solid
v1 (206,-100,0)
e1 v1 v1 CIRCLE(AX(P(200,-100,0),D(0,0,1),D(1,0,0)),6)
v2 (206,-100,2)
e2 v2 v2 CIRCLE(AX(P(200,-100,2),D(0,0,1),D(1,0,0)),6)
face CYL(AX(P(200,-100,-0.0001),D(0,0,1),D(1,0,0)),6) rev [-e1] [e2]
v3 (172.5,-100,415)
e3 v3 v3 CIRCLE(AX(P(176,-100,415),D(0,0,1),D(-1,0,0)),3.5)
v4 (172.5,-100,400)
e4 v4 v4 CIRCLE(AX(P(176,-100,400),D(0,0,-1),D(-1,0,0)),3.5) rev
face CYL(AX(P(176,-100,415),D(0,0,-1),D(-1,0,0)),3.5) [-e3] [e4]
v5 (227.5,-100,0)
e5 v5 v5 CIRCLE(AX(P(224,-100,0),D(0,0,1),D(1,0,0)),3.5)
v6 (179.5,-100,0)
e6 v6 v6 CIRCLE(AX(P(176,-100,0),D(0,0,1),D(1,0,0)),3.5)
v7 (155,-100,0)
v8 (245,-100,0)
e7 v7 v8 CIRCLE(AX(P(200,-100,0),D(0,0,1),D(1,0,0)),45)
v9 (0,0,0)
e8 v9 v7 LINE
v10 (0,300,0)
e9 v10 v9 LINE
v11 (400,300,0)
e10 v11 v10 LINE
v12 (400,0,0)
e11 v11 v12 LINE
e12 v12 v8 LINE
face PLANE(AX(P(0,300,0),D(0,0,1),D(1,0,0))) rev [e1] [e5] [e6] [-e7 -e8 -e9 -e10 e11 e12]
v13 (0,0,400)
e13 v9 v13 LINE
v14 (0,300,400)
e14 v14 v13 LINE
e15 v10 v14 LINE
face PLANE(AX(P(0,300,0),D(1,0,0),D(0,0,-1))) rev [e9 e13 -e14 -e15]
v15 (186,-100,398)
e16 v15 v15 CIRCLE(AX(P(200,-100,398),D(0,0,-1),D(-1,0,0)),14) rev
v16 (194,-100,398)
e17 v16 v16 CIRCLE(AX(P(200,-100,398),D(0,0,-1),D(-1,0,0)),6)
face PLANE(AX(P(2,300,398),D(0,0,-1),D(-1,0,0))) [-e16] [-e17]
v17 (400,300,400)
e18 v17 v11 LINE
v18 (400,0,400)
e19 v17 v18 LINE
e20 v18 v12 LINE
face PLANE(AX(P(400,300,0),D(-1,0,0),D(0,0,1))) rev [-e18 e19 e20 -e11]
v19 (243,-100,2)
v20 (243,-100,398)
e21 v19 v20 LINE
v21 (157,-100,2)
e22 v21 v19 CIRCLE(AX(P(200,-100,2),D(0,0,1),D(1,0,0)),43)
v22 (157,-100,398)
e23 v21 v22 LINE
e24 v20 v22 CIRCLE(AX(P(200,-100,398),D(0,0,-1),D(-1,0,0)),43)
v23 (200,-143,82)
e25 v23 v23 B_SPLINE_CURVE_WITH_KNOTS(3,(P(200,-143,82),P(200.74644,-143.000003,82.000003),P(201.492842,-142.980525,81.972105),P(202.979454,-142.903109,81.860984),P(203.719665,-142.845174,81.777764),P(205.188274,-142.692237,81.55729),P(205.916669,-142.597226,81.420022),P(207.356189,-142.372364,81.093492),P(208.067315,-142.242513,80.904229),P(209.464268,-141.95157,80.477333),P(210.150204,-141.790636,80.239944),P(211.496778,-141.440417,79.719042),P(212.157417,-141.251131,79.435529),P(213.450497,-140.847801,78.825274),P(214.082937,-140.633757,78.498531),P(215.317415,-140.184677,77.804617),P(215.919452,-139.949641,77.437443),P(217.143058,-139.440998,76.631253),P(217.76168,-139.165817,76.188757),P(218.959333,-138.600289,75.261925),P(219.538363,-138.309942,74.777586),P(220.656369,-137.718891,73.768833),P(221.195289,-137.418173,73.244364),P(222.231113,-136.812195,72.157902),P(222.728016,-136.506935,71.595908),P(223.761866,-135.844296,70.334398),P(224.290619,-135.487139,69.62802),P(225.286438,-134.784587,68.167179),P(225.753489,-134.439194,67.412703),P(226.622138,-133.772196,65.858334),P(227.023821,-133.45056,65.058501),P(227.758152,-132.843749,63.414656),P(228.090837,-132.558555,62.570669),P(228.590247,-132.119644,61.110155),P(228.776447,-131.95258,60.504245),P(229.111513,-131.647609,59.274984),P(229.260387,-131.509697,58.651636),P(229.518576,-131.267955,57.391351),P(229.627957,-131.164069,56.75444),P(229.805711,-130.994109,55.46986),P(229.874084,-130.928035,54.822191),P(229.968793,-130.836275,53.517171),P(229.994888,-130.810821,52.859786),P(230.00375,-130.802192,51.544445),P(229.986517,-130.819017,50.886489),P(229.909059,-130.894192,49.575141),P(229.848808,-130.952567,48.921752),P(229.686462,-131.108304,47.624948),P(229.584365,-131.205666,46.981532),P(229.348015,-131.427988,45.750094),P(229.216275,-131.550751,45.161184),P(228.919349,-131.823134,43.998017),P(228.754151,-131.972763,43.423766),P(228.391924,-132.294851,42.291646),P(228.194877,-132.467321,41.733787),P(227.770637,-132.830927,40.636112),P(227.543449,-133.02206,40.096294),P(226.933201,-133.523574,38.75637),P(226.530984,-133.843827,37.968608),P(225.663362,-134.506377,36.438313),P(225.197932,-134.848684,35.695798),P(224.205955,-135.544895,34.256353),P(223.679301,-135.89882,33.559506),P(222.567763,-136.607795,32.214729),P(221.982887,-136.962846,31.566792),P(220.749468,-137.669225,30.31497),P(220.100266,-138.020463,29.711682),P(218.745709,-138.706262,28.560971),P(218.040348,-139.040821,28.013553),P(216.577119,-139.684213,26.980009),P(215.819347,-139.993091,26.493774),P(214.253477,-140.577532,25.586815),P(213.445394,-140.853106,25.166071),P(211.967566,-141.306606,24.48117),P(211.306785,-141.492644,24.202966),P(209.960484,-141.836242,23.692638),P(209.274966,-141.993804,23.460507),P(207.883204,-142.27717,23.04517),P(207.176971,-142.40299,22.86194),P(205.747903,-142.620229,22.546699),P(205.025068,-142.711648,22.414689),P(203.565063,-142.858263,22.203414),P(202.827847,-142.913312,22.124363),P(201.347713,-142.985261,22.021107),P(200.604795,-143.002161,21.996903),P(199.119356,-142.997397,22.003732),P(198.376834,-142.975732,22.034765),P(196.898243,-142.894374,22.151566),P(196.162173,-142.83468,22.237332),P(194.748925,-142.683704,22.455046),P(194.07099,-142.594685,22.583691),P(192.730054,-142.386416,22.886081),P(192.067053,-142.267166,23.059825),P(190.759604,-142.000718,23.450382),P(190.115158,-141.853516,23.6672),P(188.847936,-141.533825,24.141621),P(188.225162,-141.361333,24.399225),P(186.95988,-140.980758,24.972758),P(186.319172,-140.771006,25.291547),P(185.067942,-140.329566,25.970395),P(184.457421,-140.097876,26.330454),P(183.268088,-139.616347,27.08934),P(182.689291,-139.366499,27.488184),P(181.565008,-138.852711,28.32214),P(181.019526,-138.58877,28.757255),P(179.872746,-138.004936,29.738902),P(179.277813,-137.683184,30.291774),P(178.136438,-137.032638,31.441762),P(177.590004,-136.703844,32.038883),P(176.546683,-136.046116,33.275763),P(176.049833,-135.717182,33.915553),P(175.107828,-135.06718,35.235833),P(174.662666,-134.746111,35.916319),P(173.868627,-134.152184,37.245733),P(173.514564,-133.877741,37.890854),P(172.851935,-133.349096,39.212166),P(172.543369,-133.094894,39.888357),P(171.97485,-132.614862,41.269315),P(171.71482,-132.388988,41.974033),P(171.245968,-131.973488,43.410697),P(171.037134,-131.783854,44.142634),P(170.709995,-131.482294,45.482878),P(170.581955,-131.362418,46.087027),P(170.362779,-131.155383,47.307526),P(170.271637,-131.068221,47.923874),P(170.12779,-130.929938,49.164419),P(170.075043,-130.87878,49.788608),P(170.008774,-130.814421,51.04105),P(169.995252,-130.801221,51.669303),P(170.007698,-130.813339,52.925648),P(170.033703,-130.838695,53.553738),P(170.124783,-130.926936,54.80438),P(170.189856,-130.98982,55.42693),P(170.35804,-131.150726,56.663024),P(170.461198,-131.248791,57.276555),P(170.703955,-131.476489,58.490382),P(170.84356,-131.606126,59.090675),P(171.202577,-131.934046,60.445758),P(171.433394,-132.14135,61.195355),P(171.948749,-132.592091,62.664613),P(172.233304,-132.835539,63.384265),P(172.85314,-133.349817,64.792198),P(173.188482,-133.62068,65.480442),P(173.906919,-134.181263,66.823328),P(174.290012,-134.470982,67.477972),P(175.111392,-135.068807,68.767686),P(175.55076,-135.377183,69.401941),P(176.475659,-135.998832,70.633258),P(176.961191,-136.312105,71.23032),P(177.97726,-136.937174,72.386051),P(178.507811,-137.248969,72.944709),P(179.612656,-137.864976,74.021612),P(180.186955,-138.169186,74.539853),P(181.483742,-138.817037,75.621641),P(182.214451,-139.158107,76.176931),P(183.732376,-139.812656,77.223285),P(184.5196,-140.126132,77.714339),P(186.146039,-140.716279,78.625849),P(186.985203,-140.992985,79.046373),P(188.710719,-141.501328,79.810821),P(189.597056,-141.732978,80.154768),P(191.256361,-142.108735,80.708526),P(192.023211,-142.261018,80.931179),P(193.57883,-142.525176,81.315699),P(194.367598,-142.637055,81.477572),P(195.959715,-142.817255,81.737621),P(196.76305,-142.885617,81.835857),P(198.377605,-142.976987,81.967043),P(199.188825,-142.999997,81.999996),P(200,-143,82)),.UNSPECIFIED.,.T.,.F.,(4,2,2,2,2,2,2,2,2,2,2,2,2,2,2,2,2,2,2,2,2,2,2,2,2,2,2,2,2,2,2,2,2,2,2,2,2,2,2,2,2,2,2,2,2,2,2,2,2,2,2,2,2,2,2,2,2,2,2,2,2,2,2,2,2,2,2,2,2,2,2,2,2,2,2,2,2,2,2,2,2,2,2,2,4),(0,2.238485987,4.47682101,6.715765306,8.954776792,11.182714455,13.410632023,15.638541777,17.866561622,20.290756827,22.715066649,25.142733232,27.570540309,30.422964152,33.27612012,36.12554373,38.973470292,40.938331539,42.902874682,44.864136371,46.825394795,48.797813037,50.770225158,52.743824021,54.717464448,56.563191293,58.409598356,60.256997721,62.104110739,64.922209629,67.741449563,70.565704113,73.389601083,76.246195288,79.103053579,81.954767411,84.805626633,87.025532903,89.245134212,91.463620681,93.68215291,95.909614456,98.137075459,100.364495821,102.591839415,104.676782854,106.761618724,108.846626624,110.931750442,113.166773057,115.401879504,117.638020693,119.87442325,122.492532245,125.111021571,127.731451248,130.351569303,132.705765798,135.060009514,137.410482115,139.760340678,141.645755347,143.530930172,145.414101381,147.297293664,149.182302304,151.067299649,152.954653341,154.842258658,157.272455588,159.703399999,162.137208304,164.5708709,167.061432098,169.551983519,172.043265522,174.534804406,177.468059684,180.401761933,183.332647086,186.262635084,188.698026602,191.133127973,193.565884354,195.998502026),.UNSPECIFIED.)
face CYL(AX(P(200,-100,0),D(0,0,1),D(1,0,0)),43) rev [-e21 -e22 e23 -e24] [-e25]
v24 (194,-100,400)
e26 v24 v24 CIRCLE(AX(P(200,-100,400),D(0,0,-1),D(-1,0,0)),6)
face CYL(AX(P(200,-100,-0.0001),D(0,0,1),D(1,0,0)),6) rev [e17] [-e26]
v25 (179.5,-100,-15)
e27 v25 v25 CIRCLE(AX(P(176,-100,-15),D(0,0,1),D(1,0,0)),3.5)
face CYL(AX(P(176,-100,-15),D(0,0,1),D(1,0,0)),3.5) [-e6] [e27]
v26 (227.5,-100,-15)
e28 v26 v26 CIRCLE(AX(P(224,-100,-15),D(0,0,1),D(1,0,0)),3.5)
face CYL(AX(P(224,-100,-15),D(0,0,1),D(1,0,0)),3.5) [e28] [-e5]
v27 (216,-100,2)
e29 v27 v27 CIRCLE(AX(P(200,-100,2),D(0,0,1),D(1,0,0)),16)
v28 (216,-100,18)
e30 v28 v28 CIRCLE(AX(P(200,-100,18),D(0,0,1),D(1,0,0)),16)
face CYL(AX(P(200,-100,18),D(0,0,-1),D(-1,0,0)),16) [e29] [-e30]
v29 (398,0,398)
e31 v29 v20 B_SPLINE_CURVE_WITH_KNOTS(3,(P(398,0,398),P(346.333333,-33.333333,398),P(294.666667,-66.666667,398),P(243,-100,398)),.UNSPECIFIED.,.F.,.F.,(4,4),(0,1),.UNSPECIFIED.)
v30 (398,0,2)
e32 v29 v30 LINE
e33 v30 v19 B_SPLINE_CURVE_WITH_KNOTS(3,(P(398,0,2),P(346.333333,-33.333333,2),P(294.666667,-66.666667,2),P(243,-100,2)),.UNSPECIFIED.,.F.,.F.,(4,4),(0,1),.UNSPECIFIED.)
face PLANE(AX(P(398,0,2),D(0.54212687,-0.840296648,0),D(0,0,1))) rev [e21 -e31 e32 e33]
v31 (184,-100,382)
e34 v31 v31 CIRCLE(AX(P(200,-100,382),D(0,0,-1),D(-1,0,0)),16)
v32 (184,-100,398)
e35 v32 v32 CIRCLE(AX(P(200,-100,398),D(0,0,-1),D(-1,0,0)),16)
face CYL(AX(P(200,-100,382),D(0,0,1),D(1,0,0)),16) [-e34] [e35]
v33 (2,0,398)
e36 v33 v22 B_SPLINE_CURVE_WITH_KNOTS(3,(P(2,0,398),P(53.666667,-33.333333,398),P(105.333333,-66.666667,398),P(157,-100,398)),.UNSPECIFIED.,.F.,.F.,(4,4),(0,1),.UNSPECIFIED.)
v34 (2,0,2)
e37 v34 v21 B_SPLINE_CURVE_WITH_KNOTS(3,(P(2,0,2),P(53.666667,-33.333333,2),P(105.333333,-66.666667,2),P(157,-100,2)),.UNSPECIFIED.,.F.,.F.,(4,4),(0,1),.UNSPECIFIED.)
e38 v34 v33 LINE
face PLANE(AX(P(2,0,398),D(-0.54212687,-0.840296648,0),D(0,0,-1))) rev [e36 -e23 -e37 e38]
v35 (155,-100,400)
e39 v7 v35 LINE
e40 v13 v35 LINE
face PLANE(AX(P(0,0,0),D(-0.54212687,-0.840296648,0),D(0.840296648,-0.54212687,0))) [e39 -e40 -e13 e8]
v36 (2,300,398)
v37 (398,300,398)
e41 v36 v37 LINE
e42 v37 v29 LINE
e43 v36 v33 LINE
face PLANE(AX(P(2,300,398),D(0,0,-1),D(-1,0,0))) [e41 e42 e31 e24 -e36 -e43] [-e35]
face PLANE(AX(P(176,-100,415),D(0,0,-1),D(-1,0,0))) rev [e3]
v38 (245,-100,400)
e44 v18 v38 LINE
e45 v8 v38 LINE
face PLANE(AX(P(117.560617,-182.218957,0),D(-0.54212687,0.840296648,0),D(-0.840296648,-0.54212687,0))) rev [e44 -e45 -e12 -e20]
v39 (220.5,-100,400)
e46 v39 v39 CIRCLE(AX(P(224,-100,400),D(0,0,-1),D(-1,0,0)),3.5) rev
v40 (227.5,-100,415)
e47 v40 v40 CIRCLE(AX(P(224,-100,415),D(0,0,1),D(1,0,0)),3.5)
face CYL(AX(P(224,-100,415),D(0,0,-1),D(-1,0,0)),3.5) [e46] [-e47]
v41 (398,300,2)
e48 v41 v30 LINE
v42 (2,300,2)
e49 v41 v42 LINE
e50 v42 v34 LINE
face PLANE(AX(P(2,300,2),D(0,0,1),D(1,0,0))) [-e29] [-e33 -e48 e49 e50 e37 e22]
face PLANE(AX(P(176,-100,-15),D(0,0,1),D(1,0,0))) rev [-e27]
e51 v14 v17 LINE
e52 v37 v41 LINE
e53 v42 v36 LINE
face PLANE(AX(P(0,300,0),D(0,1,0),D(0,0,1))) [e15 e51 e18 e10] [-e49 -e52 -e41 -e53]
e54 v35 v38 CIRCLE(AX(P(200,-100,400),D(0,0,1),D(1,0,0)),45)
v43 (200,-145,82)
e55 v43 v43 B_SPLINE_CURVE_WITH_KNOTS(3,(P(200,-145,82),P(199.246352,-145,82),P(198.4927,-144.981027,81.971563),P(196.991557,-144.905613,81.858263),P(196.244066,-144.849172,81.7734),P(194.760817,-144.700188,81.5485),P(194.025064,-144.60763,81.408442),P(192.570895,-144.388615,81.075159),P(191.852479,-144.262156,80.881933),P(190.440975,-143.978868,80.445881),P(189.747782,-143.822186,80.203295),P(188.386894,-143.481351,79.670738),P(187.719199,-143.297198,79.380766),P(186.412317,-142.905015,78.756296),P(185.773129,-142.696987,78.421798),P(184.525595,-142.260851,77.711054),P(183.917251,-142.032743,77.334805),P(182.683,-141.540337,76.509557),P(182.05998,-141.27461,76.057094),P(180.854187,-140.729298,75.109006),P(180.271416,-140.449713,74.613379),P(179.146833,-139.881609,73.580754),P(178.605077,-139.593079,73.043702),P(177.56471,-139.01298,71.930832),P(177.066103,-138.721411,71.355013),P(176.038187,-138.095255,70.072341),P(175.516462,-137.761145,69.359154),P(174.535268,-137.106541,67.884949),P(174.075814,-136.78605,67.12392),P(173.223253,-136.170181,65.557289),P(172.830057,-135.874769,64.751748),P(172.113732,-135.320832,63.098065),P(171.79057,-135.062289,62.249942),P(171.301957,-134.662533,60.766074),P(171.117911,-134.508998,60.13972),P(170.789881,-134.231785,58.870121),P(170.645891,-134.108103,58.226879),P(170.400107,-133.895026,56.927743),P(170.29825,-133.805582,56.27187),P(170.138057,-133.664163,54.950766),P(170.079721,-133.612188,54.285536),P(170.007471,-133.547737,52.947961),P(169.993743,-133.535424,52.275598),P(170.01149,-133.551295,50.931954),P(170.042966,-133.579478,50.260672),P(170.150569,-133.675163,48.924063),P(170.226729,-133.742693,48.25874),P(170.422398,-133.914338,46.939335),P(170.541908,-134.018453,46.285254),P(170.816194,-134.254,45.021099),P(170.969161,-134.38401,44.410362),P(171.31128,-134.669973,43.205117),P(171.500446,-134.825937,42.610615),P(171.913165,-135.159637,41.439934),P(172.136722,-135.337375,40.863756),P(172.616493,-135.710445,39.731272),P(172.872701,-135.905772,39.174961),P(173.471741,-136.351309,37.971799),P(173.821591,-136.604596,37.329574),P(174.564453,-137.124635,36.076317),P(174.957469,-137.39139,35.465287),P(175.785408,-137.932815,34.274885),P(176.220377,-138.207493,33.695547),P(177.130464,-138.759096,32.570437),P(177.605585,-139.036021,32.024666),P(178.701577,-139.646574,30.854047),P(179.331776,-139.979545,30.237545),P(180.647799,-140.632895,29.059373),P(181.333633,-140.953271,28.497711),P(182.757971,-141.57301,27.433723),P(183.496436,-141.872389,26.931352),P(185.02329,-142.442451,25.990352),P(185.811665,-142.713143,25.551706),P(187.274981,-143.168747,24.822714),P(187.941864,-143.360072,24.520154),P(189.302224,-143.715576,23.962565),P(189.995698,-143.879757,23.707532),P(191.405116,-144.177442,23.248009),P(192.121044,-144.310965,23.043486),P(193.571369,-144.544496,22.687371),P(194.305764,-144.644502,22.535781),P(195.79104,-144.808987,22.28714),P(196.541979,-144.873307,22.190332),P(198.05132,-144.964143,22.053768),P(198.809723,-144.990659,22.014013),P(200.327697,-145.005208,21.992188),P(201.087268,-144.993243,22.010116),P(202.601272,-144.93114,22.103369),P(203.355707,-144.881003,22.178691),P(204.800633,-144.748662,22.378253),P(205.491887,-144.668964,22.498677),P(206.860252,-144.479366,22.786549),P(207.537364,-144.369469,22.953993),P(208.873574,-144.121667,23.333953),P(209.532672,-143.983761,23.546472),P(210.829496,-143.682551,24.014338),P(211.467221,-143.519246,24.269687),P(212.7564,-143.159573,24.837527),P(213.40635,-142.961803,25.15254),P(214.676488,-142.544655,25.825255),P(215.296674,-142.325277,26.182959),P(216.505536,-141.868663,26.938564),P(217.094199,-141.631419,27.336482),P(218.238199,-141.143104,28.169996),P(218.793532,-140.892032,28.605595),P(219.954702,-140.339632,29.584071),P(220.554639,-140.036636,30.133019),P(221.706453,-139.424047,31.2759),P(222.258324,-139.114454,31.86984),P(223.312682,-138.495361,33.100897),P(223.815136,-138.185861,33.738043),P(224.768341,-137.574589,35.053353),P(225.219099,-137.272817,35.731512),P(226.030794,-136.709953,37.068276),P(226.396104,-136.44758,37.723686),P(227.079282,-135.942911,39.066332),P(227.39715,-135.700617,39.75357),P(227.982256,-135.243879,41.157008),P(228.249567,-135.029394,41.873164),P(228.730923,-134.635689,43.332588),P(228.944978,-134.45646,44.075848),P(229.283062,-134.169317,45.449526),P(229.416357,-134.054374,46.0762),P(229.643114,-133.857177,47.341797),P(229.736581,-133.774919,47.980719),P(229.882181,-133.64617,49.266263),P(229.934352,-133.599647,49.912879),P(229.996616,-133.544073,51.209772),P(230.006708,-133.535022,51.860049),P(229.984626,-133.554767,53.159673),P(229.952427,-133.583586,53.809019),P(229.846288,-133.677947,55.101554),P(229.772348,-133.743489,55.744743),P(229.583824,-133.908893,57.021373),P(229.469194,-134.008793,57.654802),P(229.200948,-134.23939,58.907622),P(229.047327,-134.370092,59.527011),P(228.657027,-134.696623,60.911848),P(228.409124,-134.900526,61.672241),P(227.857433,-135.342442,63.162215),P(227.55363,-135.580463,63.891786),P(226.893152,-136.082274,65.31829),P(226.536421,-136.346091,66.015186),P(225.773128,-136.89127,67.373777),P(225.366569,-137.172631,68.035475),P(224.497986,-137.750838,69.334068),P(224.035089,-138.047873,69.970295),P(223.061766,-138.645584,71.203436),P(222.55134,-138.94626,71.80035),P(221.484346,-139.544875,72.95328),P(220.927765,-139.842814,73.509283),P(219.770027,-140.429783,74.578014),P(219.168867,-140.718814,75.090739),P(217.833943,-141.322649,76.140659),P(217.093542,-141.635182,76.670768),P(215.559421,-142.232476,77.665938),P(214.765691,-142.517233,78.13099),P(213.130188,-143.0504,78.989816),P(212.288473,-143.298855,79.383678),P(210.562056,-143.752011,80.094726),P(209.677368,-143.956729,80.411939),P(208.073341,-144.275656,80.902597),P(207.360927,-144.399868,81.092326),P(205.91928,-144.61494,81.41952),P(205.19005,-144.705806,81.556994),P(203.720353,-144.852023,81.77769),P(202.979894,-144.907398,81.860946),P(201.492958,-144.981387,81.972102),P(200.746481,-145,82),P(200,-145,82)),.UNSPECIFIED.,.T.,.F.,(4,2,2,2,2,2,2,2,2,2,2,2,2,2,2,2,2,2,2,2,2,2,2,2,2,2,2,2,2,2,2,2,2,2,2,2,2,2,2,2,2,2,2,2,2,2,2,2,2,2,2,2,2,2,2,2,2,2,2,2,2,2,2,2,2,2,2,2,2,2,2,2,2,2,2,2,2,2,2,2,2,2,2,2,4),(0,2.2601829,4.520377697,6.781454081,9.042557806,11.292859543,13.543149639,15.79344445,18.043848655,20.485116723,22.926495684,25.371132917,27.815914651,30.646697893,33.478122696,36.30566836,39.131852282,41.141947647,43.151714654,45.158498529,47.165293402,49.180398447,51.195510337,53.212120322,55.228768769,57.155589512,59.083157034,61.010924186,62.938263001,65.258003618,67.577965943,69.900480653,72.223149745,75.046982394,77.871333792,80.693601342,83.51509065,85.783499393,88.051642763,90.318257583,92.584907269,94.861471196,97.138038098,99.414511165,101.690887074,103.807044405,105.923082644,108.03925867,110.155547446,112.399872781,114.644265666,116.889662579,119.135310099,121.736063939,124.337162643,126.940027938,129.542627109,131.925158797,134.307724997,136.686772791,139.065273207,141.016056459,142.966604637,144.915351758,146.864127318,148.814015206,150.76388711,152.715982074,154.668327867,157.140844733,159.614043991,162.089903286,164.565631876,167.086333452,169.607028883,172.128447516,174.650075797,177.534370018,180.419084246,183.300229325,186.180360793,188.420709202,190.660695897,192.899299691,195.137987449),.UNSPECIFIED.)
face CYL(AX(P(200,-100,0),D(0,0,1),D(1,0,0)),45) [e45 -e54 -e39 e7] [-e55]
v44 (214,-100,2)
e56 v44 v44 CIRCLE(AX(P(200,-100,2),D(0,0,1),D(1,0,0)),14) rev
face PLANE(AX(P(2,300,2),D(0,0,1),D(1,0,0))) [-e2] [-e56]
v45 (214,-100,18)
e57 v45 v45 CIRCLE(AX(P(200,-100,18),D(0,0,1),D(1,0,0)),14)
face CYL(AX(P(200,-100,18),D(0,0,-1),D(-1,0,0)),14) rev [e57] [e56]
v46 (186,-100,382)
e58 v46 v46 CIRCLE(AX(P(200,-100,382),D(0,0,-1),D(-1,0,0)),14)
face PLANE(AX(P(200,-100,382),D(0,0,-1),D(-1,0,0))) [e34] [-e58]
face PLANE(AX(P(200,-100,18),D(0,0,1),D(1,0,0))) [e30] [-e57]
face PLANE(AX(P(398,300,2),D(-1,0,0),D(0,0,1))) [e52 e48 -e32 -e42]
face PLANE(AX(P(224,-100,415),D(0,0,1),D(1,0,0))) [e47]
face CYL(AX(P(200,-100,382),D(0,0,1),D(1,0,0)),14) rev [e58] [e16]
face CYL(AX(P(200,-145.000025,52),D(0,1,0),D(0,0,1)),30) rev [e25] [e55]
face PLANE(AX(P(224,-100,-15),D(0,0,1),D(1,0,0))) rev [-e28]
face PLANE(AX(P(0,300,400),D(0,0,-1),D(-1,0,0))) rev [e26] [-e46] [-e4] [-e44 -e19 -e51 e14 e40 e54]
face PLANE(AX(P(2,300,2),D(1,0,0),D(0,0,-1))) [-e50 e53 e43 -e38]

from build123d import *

# Parameters (mm, degrees)
SKETCH1_W               = 400
SKETCH1_H               = 400
SKETCH1_W_2             = 396
SKETCH1_H_2             = 396
BOSS_EXTRUDE1_DEPTH     = 300
CUT_LOFT1_START         = 2
CUT_LOFT1_DEPTH         = 396
BOSS_EXTRUDE2_DEPTH     = 400
BOSS_EXTRUDE3_DEPTH     = 2
BOSS_EXTRUDE6_START     = -398
BOSS_EXTRUDE6_DEPTH     = 2
CUT_EXTRUDE1_DEPTH      = 641.312423915
CUT_EXTRUDE1_DEPTH_BACK = 641.312423915
SKETCH9_R               = 6
BOSS_EXTRUDE4_START     = -2
SKETCH10_R              = 16
SKETCH10_R_2            = 14
BOSS_EXTRUDE4_DEPTH     = 16
BOSS_EXTRUDE5_START     = -18
SKETCH11_R              = 16
SKETCH11_R_2            = 14
BOSS_EXTRUDE5_DEPTH     = 16
CUT_EXTRUDE2_DEPTH      = 720.739536394
CUT_EXTRUDE2_DEPTH_BACK = 720.739536394
SKETCH13_R              = 30
SKETCH14_R              = 3.5
BOSS_EXTRUDE7_DEPTH     = 15
BOSS_EXTRUDE8_START     = -415
SKETCH14_2_R            = 3.5
BOSS_EXTRUDE8_DEPTH     = 15


# Read off the part's stored shape, not the designer's step: Cut-Loft1
with BuildPart() as part:
    # Sketch1 → Boss-Extrude1 (new body)
    with BuildSketch(Plane(origin=(0, 0, 0), x_dir=(1, 0, 0), z_dir=(0, 1, 0))):
        with Locations((200, -200)):
            Rectangle(SKETCH1_W, SKETCH1_H)
        with Locations((200, -200)):
            Rectangle(SKETCH1_W_2, SKETCH1_H_2, mode=Mode.SUBTRACT)
    extrude(amount=BOSS_EXTRUDE1_DEPTH)

    # Upper_profile → Loft6 section 0
    with BuildSketch(Plane(origin=(0, 0, 0), x_dir=(1, 0, 0), z_dir=(0, 1, 0))):
        with BuildLine():
            Line((0, 0), (400, 0))
            Line((400, 0), (400, -400))
            Line((400, -400), (0, -400))
            Line((0, -400), (0, 0))
        make_face()
    # Bellow_profile → Loft6 section 1
    with BuildSketch(Plane(origin=(0, -100, 0), x_dir=(1, 0, 0), z_dir=(0, 1, 0))):
        with BuildLine():
            Line((155, 0), (245, 0))
            Line((245, 0), (245, -400))
            Line((245, -400), (155, -400))
            Line((155, -400), (155, 0))
        make_face()
    loft()

    # Cut-Loft1 outline → Cut-Loft1 (cut)
    with BuildSketch(Plane.XY.offset(CUT_LOFT1_START)):
        Polygon((157, -100), (243, -100), (398, 0), (2, 0), align=None)
    extrude(amount=CUT_LOFT1_DEPTH, mode=Mode.SUBTRACT)

    # Sketch7 → Boss-Extrude2 (add)
    with BuildSketch(Plane.XY.offset(400)):
        with BuildLine():
            Line((155, -100), (157, -100))
            ThreePointArc((157, -100), (200, -143), (243, -100))
            Line((243, -100), (245, -100))
            ThreePointArc((245, -100), (200, -145), (155, -100))
        make_face()
    extrude(amount=-BOSS_EXTRUDE2_DEPTH)

    # Sketch8 → Boss-Extrude3 (add)
    with BuildSketch(Plane.XY.offset(400)):
        with BuildLine():
            Line((245, -100), (155, -100))
            ThreePointArc((155, -100), (200, -145), (245, -100))
        make_face()
    extrude(amount=-BOSS_EXTRUDE3_DEPTH)

    # Sketch8<2> → Boss-Extrude6 (add)
    with BuildSketch(Plane.XY.offset(400).offset(BOSS_EXTRUDE6_START)):
        with BuildLine():
            Line((245, -100), (155, -100))
            ThreePointArc((155, -100), (200, -145), (245, -100))
        make_face()
    extrude(amount=-BOSS_EXTRUDE6_DEPTH)

    # Sketch9 → Cut-Extrude1 (cut, two sides: drawn at the far end of the back side and taken through both)
    with BuildSketch(Plane.XY.offset(400).offset(-CUT_EXTRUDE1_DEPTH_BACK)):
        with Locations(Location((200, -100, 0), (0, 0, 180))):
            Circle(SKETCH9_R)
    extrude(amount=CUT_EXTRUDE1_DEPTH + CUT_EXTRUDE1_DEPTH_BACK, mode=Mode.SUBTRACT)

    # Sketch10 → Boss-Extrude4 (add)
    with BuildSketch(Plane.XY.offset(400).offset(BOSS_EXTRUDE4_START)):
        with Locations(Location((200, -100, 0), (0, 0, 180))):
            Circle(SKETCH10_R)
        with Locations(Location((200, -100, 0), (0, 0, 180))):
            Circle(SKETCH10_R_2, mode=Mode.SUBTRACT)
    extrude(amount=-BOSS_EXTRUDE4_DEPTH)

    # Sketch11 → Boss-Extrude5 (add)
    with BuildSketch(Plane(origin=(0, 0, 0), x_dir=(-1, 0, 0), z_dir=(0, 0, -1)).offset(BOSS_EXTRUDE5_START)):
        with Locations((-200, -100)):
            Circle(SKETCH11_R)
        with Locations((-200, -100)):
            Circle(SKETCH11_R_2, mode=Mode.SUBTRACT)
    extrude(amount=BOSS_EXTRUDE5_DEPTH)

    # Sketch13 → Cut-Extrude2 (cut, two sides: drawn at the far end of the back side and taken through both)
    with BuildSketch(Plane(origin=(0, 300, 0), x_dir=(1, 0, 0), z_dir=(0, 1, 0)).offset(-CUT_EXTRUDE2_DEPTH_BACK)):
        with Locations(Location((200, -52, 0), (0, 0, 270))):
            Circle(SKETCH13_R)
    extrude(amount=CUT_EXTRUDE2_DEPTH + CUT_EXTRUDE2_DEPTH_BACK, mode=Mode.SUBTRACT)

    # Sketch14 → Boss-Extrude7 (add)
    with BuildSketch(Plane.XY.offset(400)):
        with Locations(Location((224, -100, 0), (0, 0, 180))):
            Circle(SKETCH14_R)
        with Locations(Location((176, -100, 0), (0, 0, 180))):
            Circle(SKETCH14_R)
    extrude(amount=BOSS_EXTRUDE7_DEPTH)

    # Sketch14<2> → Boss-Extrude8 (add)
    with BuildSketch(Plane.XY.offset(400).offset(BOSS_EXTRUDE8_START)):
        with Locations(Location((224, -100, 0), (0, 0, 180))):
            Circle(SKETCH14_2_R)
        with Locations(Location((176, -100, 0), (0, 0, 180))):
            Circle(SKETCH14_2_R)
    extrude(amount=BOSS_EXTRUDE8_DEPTH)


solid = part.part
